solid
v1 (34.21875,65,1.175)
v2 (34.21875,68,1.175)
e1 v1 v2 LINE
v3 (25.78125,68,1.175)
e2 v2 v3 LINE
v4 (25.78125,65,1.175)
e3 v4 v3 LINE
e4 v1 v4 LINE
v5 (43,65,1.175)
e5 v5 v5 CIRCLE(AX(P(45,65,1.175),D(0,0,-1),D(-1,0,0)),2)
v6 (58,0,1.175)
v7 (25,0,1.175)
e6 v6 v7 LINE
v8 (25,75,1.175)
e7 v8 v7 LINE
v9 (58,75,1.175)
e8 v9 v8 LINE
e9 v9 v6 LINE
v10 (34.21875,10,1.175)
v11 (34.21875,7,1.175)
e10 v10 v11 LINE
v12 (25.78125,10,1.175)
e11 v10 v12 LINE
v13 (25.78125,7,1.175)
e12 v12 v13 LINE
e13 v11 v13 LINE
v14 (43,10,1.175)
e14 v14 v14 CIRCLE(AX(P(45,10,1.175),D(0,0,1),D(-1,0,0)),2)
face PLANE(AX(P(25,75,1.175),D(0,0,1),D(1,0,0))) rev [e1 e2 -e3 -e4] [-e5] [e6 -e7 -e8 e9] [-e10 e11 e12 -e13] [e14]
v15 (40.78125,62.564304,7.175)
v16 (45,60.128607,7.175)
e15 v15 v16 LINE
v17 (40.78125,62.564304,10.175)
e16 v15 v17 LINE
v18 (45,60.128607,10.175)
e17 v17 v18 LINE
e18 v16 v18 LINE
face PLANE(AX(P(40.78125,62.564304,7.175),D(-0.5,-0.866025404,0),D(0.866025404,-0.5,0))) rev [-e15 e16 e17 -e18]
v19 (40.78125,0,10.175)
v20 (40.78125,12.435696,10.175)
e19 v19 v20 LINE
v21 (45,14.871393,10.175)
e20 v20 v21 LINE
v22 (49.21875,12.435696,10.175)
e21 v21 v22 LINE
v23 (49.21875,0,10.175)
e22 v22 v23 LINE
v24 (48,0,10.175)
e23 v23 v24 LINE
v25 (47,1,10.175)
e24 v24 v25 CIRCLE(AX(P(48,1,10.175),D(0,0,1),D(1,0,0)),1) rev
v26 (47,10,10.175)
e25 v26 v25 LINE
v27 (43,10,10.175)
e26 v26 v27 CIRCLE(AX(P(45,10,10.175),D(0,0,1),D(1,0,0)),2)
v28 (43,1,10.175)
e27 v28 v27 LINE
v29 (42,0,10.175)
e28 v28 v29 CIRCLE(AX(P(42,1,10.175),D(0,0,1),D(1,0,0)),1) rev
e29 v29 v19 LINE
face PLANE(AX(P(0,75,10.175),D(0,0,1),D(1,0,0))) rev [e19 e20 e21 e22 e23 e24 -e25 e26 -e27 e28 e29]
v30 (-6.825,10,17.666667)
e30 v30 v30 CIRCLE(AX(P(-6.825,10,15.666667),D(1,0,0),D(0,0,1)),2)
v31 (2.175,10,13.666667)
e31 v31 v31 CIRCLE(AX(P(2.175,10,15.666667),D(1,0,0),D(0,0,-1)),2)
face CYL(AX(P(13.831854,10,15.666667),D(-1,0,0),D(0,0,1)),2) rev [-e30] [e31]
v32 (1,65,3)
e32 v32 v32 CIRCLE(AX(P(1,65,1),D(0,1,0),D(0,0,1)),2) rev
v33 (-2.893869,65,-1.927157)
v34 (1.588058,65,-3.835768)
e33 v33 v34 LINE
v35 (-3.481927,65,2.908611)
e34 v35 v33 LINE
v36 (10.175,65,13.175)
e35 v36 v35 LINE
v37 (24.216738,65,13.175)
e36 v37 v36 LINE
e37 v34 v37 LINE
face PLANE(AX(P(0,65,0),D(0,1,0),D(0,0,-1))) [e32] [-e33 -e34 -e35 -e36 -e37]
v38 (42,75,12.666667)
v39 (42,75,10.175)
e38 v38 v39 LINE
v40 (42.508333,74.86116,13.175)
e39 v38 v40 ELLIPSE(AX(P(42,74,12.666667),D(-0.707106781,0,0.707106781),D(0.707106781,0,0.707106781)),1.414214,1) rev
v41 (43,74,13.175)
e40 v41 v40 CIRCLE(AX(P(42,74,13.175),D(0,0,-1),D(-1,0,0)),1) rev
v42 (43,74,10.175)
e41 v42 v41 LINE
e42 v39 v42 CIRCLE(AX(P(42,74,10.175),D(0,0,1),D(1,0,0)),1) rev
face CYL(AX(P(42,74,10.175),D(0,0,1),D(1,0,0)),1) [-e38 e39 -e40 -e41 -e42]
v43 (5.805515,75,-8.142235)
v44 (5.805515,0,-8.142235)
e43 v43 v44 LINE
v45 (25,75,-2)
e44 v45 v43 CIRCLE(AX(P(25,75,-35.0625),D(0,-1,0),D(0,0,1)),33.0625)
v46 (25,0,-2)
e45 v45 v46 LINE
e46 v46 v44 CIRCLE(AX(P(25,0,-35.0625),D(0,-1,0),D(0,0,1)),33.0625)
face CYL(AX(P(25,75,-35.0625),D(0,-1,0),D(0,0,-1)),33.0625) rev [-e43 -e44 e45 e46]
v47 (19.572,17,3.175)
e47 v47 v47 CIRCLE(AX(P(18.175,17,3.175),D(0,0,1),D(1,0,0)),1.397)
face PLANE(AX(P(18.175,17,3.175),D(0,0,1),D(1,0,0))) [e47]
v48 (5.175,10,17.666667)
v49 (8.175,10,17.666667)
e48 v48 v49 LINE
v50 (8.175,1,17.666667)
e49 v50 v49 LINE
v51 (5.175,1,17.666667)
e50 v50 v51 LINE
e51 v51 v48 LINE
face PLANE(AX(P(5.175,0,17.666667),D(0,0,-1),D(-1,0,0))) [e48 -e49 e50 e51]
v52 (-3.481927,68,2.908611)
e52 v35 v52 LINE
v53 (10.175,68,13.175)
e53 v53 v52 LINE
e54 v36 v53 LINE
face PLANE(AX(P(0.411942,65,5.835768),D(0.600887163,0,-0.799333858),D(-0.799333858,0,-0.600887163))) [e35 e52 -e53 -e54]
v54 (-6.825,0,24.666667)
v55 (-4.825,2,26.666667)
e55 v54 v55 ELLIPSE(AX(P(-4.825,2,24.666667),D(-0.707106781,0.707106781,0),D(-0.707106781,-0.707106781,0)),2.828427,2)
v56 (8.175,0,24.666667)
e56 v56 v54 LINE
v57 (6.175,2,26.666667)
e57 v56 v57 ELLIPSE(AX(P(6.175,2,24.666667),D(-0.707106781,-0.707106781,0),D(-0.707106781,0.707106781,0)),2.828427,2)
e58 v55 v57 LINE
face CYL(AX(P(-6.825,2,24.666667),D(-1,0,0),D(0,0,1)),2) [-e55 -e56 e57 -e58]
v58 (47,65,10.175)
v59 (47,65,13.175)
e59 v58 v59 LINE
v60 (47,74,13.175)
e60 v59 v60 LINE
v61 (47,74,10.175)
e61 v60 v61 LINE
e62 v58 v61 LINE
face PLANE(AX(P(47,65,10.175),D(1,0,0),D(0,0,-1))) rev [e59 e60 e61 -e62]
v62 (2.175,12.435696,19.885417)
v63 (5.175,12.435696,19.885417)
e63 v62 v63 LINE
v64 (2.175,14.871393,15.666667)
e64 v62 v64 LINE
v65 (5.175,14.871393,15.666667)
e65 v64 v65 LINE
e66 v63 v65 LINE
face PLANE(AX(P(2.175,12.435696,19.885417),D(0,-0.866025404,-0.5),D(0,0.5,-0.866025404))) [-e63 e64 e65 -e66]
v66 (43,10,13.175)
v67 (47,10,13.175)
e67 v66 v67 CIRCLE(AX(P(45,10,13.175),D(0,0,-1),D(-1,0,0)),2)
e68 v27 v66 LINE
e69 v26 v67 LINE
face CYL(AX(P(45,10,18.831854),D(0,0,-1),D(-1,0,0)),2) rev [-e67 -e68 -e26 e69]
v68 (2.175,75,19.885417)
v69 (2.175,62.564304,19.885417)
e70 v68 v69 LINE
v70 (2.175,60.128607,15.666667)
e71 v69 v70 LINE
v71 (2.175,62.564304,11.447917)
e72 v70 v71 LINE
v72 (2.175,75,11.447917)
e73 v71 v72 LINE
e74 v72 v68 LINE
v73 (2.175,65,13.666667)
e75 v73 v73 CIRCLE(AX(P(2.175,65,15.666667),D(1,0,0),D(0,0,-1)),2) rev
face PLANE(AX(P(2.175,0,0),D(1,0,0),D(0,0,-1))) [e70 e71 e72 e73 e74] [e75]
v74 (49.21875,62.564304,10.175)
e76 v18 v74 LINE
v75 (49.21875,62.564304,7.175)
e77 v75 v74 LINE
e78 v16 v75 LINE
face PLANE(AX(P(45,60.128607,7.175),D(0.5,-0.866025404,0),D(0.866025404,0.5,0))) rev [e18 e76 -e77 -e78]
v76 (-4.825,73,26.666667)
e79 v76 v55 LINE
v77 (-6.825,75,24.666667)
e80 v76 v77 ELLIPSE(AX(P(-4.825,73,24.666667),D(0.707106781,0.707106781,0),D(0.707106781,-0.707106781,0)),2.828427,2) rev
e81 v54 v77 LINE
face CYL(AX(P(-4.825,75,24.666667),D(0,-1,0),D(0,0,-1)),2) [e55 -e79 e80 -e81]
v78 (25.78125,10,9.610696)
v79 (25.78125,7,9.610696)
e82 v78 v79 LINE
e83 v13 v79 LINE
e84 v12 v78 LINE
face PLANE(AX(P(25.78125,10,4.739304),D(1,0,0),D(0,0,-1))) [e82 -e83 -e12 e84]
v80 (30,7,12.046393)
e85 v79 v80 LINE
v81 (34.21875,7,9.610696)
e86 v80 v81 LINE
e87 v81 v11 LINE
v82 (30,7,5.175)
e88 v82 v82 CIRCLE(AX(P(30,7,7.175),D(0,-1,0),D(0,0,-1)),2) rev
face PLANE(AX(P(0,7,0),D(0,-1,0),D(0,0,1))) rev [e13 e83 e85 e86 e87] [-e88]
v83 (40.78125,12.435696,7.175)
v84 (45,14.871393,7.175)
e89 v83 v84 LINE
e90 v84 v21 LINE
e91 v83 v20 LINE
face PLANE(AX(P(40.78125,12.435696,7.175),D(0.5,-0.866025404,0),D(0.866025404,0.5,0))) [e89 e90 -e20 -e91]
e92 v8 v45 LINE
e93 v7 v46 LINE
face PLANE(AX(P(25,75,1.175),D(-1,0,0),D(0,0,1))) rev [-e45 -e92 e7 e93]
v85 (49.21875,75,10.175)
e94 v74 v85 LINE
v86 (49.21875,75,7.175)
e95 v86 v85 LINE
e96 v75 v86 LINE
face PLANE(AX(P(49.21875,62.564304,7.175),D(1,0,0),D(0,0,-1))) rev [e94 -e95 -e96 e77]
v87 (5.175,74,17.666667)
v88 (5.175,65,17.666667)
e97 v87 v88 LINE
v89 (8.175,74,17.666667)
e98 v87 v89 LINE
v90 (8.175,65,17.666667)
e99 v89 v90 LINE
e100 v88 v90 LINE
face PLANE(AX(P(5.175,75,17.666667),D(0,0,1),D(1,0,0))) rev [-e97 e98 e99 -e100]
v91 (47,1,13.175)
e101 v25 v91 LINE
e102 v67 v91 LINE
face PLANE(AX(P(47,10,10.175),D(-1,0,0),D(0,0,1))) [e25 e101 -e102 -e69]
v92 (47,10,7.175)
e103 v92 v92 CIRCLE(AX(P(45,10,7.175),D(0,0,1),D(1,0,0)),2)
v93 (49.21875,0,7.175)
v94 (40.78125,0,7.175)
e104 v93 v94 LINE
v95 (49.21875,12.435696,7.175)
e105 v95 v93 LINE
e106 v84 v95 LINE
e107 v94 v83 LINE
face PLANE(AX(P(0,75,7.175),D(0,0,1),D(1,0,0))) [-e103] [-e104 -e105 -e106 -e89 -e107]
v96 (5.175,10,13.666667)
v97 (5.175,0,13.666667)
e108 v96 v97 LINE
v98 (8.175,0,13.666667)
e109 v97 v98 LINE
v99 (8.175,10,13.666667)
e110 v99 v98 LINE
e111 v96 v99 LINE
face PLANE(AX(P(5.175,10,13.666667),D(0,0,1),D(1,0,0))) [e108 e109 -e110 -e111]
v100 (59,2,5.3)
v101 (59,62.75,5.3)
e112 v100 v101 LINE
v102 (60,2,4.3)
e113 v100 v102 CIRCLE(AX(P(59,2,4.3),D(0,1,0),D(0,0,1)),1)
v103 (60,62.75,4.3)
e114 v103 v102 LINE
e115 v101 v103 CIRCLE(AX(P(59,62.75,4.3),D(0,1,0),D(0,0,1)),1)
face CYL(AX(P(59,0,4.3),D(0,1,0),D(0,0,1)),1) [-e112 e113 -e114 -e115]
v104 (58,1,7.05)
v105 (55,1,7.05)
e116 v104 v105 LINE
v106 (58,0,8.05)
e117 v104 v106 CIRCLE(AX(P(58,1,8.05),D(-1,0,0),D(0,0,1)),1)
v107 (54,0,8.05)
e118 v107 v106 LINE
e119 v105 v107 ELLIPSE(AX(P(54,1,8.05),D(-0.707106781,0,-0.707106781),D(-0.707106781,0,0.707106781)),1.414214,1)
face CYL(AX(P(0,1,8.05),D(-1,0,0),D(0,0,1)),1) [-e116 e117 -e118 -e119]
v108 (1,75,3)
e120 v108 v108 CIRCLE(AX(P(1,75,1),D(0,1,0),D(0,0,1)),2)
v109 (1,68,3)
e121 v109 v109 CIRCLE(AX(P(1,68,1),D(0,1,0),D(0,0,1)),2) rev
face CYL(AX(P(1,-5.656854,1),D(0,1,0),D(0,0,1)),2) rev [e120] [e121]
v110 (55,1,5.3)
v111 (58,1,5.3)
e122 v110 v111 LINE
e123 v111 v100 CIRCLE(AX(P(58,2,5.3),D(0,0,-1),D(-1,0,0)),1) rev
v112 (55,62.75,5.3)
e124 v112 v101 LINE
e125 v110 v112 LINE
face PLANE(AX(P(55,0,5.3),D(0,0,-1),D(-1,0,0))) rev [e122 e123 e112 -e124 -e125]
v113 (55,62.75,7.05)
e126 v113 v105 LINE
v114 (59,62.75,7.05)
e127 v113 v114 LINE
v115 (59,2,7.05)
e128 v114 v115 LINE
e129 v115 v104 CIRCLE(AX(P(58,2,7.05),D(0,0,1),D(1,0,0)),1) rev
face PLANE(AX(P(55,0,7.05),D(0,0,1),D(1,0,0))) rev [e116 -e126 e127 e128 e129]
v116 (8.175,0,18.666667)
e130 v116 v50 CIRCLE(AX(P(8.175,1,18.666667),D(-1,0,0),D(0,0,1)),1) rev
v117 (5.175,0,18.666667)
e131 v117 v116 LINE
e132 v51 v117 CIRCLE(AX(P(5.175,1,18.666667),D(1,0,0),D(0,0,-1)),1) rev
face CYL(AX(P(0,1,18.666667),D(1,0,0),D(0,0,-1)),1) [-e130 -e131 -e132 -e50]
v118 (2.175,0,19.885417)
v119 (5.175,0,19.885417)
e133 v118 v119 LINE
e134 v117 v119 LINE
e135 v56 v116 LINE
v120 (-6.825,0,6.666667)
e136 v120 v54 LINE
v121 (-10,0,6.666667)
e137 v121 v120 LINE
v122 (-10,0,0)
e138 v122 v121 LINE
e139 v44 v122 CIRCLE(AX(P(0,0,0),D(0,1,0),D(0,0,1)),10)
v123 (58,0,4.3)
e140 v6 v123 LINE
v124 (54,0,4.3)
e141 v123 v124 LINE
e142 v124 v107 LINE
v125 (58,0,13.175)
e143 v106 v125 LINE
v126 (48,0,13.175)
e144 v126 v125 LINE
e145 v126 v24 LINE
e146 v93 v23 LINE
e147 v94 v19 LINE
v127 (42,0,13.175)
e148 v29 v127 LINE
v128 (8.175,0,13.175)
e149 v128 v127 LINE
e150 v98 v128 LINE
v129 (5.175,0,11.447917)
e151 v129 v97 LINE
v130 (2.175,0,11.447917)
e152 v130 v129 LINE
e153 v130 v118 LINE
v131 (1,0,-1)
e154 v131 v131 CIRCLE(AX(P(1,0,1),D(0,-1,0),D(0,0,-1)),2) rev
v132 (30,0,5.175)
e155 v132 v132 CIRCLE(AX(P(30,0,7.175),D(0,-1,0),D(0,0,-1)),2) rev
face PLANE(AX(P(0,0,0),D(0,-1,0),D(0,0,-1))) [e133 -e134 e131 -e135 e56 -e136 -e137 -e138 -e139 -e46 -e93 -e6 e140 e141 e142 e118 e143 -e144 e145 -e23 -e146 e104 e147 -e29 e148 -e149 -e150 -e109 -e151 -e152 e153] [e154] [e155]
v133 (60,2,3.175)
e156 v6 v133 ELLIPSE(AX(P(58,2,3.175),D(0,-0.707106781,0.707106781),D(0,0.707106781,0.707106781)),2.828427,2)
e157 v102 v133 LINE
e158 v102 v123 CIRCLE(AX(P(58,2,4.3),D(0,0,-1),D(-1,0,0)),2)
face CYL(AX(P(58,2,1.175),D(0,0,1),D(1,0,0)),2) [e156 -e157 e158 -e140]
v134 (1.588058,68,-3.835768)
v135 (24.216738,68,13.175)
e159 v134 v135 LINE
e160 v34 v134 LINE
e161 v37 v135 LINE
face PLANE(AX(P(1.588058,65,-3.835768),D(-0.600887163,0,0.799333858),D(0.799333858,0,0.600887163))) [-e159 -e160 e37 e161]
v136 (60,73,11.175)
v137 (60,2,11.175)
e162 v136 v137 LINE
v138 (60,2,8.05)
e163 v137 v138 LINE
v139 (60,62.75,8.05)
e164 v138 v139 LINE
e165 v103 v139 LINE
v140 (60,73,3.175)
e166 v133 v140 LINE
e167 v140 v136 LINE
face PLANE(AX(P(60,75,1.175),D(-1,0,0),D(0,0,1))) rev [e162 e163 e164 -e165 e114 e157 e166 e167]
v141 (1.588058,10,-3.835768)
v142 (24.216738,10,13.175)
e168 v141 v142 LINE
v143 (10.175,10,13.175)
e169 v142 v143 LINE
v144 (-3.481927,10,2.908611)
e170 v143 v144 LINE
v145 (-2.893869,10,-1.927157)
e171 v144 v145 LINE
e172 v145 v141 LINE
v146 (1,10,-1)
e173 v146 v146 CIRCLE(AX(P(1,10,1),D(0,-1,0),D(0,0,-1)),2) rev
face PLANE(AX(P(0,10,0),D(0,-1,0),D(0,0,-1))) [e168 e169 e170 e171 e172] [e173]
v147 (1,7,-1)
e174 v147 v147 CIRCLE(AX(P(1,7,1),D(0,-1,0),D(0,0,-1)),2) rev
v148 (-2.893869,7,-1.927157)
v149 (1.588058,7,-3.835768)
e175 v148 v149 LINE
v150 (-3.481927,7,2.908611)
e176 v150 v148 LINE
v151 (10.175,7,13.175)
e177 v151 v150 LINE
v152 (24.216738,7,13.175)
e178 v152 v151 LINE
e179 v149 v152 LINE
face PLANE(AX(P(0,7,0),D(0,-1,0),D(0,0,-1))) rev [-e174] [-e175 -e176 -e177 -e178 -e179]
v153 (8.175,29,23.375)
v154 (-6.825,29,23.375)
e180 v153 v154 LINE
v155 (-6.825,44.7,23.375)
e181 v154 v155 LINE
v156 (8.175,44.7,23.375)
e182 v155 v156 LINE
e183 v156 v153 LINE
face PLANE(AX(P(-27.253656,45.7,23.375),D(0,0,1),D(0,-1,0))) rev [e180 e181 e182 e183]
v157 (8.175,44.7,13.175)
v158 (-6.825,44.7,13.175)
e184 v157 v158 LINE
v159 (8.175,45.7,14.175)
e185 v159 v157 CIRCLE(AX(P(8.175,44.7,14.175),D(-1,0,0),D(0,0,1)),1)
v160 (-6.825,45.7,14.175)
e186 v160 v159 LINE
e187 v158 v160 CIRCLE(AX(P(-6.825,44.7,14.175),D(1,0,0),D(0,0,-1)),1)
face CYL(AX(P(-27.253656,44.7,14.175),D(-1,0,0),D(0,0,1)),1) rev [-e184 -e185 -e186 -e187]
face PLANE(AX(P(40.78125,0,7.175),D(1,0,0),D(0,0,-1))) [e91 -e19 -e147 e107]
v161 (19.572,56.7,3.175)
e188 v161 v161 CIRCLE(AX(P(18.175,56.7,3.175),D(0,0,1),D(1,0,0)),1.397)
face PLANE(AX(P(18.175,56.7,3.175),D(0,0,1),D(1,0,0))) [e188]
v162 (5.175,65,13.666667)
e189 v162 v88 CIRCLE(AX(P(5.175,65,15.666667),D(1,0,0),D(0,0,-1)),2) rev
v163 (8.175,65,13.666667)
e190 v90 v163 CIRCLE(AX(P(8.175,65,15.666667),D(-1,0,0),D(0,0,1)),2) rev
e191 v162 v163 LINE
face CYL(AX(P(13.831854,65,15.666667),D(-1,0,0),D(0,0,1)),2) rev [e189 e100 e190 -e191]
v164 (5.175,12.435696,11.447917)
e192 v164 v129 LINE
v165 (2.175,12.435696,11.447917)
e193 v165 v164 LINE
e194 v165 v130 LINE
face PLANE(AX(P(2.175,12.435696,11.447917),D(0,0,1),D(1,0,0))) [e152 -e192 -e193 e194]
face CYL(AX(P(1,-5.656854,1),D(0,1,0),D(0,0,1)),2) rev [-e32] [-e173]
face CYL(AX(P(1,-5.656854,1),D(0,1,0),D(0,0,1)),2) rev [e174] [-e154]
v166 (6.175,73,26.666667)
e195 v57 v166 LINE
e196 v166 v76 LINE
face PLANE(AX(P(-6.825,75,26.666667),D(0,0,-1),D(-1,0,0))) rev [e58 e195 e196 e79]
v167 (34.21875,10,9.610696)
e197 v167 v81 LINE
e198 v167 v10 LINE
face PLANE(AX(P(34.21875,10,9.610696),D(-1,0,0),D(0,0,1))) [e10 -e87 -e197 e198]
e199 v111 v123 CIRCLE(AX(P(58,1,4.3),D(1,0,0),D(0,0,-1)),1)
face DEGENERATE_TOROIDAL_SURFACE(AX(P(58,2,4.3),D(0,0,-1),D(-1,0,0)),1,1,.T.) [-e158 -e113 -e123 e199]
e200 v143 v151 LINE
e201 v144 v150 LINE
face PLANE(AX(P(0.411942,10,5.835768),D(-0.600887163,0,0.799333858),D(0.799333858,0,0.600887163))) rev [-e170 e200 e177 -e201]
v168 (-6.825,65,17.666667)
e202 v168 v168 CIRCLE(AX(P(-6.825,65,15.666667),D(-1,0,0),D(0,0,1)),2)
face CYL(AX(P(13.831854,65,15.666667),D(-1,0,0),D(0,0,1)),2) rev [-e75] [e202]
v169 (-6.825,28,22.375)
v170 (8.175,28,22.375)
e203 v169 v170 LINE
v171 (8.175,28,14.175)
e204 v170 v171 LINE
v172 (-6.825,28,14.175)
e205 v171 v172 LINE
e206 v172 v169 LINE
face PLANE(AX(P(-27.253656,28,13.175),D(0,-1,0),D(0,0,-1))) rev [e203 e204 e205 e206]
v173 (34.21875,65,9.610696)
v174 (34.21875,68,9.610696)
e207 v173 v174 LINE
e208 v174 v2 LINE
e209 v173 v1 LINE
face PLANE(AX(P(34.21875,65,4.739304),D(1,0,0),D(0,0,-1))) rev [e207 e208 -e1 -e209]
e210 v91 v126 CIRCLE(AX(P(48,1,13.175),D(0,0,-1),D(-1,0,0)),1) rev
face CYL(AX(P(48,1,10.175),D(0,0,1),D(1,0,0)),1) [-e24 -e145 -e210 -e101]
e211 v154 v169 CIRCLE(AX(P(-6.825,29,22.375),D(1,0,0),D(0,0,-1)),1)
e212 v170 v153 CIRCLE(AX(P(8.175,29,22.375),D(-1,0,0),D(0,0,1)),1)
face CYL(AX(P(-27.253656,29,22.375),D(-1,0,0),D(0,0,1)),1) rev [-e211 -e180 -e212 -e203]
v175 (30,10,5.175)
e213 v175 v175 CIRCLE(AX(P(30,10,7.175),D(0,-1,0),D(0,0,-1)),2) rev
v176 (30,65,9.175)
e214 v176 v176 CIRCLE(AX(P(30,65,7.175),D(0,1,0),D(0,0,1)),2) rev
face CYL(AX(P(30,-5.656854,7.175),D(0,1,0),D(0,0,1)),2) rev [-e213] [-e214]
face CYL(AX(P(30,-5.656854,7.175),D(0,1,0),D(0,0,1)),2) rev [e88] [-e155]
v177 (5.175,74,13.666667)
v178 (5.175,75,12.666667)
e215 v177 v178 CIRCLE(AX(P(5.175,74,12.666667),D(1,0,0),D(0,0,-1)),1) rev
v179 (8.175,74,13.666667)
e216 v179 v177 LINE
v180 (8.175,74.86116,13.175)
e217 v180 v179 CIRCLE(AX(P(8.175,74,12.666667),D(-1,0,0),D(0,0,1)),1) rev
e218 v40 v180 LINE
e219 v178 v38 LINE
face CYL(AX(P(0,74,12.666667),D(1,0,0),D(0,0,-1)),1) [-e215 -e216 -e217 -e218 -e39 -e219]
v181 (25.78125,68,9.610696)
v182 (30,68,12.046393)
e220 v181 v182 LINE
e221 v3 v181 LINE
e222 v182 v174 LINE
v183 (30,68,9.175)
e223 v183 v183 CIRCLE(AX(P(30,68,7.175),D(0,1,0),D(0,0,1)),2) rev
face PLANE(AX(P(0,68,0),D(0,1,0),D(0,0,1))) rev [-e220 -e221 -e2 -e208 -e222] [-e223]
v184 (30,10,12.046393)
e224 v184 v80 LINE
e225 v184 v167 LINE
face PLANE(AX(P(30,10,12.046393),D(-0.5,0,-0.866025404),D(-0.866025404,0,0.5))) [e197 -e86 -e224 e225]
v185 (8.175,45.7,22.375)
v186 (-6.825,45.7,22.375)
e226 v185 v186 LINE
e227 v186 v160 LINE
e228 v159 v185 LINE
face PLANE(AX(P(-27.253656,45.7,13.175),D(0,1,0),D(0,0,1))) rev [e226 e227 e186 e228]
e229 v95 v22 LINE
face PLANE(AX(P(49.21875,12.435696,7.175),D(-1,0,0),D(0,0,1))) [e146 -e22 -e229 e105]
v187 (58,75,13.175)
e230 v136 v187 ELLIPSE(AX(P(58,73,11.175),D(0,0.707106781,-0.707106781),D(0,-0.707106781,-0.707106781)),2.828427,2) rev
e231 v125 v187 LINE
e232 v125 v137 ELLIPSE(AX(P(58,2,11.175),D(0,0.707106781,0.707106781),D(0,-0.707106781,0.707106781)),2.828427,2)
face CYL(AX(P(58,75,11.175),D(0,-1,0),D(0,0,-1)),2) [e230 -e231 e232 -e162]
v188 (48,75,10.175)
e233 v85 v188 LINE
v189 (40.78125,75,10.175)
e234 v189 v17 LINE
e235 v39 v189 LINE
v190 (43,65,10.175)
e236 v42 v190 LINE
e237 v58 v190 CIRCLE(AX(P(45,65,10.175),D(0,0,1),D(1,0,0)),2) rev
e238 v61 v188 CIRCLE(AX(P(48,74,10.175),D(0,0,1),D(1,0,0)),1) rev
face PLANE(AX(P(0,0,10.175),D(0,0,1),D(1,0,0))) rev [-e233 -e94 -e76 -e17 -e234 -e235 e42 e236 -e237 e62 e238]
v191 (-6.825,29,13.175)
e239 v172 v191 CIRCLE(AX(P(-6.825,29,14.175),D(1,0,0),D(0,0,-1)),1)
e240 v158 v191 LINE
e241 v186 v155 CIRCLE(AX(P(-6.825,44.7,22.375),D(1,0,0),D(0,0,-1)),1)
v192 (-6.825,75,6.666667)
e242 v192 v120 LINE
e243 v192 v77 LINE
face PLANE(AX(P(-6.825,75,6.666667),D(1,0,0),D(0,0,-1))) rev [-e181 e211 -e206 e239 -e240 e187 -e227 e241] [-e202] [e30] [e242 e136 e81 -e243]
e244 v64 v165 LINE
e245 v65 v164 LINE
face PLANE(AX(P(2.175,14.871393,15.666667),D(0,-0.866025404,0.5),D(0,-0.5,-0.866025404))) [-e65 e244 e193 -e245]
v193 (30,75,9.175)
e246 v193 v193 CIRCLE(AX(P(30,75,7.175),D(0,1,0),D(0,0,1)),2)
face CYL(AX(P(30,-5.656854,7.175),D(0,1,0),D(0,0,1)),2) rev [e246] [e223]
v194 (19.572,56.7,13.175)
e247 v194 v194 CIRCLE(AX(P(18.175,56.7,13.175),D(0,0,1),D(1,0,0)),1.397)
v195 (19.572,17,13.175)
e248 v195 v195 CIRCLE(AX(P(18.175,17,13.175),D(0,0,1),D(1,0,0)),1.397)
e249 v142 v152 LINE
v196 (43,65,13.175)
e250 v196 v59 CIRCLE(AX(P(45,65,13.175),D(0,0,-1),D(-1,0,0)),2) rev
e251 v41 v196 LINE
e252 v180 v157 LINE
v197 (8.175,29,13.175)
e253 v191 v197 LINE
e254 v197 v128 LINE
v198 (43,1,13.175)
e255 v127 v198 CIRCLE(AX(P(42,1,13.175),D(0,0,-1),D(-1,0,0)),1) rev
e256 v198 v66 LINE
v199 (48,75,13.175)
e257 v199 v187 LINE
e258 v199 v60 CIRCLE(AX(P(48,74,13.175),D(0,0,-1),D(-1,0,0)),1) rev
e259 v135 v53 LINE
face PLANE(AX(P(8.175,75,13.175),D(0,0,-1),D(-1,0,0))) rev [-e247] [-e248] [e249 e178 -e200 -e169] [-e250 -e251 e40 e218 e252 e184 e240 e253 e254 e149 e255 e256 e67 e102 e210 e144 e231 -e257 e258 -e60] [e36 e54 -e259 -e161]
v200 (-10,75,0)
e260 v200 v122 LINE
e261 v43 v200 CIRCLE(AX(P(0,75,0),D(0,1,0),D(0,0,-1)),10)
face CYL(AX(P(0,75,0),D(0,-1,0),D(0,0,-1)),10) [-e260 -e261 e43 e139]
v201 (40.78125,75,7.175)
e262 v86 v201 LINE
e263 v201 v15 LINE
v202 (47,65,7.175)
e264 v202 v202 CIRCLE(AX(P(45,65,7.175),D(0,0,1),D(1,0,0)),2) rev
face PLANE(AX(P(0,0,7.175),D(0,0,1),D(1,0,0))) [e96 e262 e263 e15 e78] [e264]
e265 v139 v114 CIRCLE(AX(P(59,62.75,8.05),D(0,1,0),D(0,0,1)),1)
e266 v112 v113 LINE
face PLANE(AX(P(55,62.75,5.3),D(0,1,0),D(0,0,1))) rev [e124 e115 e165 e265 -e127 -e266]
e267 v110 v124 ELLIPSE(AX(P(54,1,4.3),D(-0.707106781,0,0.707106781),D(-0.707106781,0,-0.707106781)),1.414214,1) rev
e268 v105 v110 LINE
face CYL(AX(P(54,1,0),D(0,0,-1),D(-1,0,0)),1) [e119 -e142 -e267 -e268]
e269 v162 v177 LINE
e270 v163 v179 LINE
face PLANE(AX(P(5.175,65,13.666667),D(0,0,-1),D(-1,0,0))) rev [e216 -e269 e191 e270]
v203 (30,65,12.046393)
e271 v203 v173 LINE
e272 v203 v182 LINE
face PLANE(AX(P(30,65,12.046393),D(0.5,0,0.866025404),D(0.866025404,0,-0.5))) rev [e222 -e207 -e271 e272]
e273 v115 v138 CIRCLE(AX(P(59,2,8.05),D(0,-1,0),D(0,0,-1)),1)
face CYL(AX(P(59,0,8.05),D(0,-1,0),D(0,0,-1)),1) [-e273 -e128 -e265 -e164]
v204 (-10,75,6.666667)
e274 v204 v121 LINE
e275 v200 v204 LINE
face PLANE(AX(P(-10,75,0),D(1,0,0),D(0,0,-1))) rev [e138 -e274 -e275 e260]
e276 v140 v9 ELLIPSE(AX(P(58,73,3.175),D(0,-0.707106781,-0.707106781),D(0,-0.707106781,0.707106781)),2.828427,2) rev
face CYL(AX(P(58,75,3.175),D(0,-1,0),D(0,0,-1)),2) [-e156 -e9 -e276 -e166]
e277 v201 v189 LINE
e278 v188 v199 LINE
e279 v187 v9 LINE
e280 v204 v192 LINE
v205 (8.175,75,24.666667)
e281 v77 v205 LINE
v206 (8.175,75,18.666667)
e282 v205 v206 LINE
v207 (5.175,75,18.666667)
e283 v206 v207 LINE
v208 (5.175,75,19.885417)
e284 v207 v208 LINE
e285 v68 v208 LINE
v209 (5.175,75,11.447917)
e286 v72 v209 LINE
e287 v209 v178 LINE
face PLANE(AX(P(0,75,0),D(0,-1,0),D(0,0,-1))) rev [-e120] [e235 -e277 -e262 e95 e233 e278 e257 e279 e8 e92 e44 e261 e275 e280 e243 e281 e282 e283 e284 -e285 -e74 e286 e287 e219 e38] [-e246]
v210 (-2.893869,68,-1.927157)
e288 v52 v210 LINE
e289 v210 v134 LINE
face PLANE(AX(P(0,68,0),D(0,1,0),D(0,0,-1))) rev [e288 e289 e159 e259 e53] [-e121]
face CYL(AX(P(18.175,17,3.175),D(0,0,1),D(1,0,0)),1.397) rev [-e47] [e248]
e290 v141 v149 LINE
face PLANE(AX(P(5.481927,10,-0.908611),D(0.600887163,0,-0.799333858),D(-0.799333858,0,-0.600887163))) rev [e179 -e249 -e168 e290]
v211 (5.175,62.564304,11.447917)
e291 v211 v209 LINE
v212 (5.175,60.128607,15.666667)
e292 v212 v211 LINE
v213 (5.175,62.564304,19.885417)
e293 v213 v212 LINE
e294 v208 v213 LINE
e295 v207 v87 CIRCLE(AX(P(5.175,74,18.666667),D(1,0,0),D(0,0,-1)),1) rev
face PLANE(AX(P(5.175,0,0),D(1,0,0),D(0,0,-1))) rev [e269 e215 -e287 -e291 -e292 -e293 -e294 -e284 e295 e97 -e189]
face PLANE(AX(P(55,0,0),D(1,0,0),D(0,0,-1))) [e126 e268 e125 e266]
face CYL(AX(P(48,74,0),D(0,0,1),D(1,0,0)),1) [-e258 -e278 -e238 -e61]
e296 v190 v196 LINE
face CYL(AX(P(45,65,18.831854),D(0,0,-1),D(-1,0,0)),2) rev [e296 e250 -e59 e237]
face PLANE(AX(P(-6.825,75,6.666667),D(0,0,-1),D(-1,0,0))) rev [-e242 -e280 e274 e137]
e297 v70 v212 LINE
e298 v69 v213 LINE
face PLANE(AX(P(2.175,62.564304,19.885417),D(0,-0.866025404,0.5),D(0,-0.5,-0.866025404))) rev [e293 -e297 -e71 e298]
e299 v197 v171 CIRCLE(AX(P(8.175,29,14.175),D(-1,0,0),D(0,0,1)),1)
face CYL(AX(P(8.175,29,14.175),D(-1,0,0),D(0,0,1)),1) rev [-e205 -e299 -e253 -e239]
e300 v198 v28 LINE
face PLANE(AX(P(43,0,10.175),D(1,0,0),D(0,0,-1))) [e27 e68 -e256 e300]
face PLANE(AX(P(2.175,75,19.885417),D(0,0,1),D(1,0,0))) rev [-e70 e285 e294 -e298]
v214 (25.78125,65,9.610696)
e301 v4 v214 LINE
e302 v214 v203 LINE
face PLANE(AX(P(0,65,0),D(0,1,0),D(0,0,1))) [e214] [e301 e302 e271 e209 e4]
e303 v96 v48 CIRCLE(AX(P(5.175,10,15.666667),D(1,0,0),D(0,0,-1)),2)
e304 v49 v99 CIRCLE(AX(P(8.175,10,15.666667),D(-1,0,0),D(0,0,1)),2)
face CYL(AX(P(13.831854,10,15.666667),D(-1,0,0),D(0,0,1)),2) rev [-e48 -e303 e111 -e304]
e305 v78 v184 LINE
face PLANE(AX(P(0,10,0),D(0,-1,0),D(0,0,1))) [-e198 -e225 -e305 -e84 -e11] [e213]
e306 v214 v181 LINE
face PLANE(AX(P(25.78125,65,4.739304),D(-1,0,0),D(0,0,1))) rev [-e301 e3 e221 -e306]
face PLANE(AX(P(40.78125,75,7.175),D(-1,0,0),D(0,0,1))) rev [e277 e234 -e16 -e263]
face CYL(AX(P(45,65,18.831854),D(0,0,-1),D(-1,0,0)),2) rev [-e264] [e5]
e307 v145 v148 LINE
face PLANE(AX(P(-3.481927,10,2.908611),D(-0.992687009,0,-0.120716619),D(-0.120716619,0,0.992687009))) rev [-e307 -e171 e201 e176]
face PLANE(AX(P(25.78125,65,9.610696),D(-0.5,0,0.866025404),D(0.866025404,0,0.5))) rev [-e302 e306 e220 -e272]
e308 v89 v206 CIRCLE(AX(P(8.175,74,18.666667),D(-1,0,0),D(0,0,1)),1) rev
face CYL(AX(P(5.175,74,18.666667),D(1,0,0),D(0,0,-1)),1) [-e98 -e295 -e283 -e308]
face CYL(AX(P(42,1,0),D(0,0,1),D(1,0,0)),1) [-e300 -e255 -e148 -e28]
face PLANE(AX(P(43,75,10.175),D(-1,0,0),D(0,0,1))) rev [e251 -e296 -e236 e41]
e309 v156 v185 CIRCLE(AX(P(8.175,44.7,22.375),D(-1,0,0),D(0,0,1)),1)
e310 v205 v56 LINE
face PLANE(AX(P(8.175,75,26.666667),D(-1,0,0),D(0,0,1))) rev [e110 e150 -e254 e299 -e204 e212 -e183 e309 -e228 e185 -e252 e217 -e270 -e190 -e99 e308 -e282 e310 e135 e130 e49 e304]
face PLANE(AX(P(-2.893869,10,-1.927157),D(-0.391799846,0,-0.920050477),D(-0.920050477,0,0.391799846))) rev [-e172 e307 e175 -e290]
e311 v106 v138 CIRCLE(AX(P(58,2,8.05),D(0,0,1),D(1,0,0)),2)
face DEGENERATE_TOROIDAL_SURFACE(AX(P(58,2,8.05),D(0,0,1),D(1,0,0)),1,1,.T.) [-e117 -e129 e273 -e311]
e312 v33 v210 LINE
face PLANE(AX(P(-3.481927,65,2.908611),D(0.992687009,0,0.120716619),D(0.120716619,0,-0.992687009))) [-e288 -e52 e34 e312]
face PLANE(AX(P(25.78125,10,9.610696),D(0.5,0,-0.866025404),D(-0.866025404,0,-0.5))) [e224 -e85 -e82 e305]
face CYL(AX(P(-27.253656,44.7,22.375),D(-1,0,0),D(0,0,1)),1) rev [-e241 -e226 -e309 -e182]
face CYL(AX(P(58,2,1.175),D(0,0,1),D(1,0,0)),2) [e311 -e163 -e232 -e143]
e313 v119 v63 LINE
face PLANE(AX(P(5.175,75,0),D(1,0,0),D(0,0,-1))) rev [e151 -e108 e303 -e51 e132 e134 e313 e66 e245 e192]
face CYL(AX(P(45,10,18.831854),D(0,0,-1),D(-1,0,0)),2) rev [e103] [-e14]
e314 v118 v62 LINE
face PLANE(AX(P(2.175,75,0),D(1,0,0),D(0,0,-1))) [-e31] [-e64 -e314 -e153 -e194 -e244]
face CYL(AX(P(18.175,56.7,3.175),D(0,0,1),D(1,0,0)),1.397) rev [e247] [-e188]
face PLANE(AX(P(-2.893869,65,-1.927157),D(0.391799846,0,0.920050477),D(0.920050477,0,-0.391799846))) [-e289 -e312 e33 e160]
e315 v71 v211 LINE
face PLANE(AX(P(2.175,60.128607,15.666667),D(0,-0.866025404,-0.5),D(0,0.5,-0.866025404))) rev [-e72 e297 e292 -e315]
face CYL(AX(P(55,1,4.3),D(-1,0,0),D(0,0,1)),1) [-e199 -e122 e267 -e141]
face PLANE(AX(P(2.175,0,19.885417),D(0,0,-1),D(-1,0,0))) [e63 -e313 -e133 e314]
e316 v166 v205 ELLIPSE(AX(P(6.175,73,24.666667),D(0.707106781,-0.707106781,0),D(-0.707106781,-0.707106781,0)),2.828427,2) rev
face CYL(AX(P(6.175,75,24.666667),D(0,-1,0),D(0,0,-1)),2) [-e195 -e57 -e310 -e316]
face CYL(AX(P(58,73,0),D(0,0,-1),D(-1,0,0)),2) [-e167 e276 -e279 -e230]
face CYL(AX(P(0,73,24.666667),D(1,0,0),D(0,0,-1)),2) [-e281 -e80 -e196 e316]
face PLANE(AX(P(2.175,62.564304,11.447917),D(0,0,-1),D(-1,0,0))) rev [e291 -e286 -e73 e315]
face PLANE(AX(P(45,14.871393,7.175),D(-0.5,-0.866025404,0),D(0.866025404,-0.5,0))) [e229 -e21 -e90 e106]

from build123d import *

# Parameters (mm, degrees)
BOSS_EXTRUDE1_DEPTH = 75
SKETCH2_R           = 2
CUT_EXTRUDE1_DEPTH  = 15
SKETCH4_R           = 2
CUT_EXTRUDE2_DEPTH  = 12
SKETCH3_R           = 2
CUT_EXTRUDE3_DEPTH  = 75
CUT_EXTRUDE4_START  = -3
CUT_EXTRUDE4_DEPTH  = 3
CUT_EXTRUDE5_START  = -3
CUT_EXTRUDE5_DEPTH  = 3
CUT_EXTRUDE6_START  = -3
CUT_EXTRUDE6_DEPTH  = 3
CUT_EXTRUDE7_START  = -3
CUT_EXTRUDE7_DEPTH  = 3
CUT_EXTRUDE12_START = -7
CUT_EXTRUDE12_DEPTH = 3
CUT_EXTRUDE14_START = -7
CUT_EXTRUDE14_DEPTH = 3
FILLET2_START       = 9
FILLET2_DEPTH       = 4.666666667
FILLET2_START_2     = 4
FILLET2_2_DEPTH     = 39
FILLET3_R           = 2
SKETCH10_W          = 1.75
SKETCH10_H          = 62.75
CUT_EXTRUDE9_DEPTH  = 5
FILLET4_R           = 1
SKETCH11_W          = 10.2
SKETCH11_H          = 17.7
CUT_EXTRUDE10_DEPTH = 15
SKETCH12_R          = 1.397
CUT_EXTRUDE11_DEPTH = 10
FILLET5_R           = 1


with BuildPart() as part:
    # Sketch1 → Boss-Extrude1 (new body)
    with BuildSketch(Plane(origin=(0, 0, 0), x_dir=(1, 0, 0), z_dir=(0, 1, 0))):
        with BuildLine():
            Line((-6.825, -6.666666667), (-6.825, -26.666666667))
            Line((-6.825, -26.666666667), (8.175, -26.666666667))
            Line((8.175, -26.666666667), (8.175, -13.175))
            Line((8.175, -13.175), (60, -13.175))
            Line((60, -13.175), (60, -1.175))
            Line((60, -1.175), (25, -1.175))
            Line((25, -1.175), (25, 2))
            ThreePointArc((25, 2), (14.923352523, 3.572976633), (5.805515239, 8.142235123))
            ThreePointArc((5.805515239, 8.142235123), (3.047757271, 9.524241472), (0, 10))
            ThreePointArc((0, 10), (-7.071067812, 7.071067812), (-10, 0))
            Line((-10, 0), (-10, -6.666666667))
            Line((-10, -6.666666667), (-6.825, -6.666666667))
        make_face()
    extrude(amount=BOSS_EXTRUDE1_DEPTH)

    # Sketch2 → Cut-Extrude1 (cut)
    with BuildSketch(Plane.ZY.offset(6.825)):
        with Locations((15.666666667, 65)):
            Circle(SKETCH2_R)
    cut_extrude1 = extrude(amount=-CUT_EXTRUDE1_DEPTH, mode=Mode.SUBTRACT)

    # Sketch4 → Cut-Extrude2 (cut)
    with BuildSketch(Plane(origin=(0, 0, 1.175), x_dir=(-1, 0, 0), z_dir=(0, 0, -1))):
        with Locations((-45, 65)):
            Circle(SKETCH4_R)
    cut_extrude2 = extrude(amount=-CUT_EXTRUDE2_DEPTH, mode=Mode.SUBTRACT)

    # Sketch3 → Cut-Extrude3 (cut)
    with BuildSketch(Plane(origin=(0, 75, 0), x_dir=(1, 0, 0), z_dir=(0, 1, 0))):
        with Locations(Location((1, -1, 0), (0, 0, 270))):
            Circle(SKETCH3_R)
        with Locations(Location((30, -7.175, 0), (0, 0, 270))):
            Circle(SKETCH3_R)
    extrude(amount=-CUT_EXTRUDE3_DEPTH, mode=Mode.SUBTRACT)

    # Sketch5 → Cut-Extrude4 (cut)
    with BuildSketch(Plane(origin=(8.175, 0, 0), x_dir=(0, 0, -1), z_dir=(1, 0, 0)).offset(CUT_EXTRUDE4_START)):
        Polygon((-19.885416667, 62.564303552), (-15.666666667, 60.128607104), (-11.447916667, 62.564303552), (-11.447916667, 75), (-19.885416667, 75), align=None)
    cut_extrude4 = extrude(amount=-CUT_EXTRUDE4_DEPTH, mode=Mode.SUBTRACT)

    # Sketch6 → Cut-Extrude5 (cut)
    with BuildSketch(Plane(origin=(8.175, 0, 0), x_dir=(0, 0, -1), z_dir=(1, 0, 0)).offset(CUT_EXTRUDE5_START)):
        with BuildLine():
            Line((-13.666666667, 65), (-13.666666667, 75))
            Line((-13.666666667, 75), (-17.666666667, 75))
            Line((-17.666666667, 75), (-17.666666667, 65))
            ThreePointArc((-17.666666667, 65), (-15.666666667, 67), (-13.666666667, 65))
        make_face()
    cut_extrude5 = extrude(amount=CUT_EXTRUDE5_DEPTH, mode=Mode.SUBTRACT)

    # Sketch7 → Cut-Extrude6 (cut)
    with BuildSketch(Plane.XY.offset(13.175).offset(CUT_EXTRUDE6_START)):
        Polygon((40.78125, 62.564303552), (45, 60.128607104), (49.21875, 62.564303552), (49.21875, 75), (40.78125, 75), align=None)
    cut_extrude6 = extrude(amount=-CUT_EXTRUDE6_DEPTH, mode=Mode.SUBTRACT)

    # Sketch8 → Cut-Extrude7 (cut)
    with BuildSketch(Plane.XY.offset(13.175).offset(CUT_EXTRUDE7_START)):
        with BuildLine():
            Line((47, 65), (47, 75))
            Line((47, 75), (43, 75))
            Line((43, 75), (43, 65))
            ThreePointArc((43, 65), (45, 67), (47, 65))
        make_face()
    cut_extrude7 = extrude(amount=CUT_EXTRUDE7_DEPTH, mode=Mode.SUBTRACT)

    # Sketch13 → Cut-Extrude12 (cut)
    with BuildSketch(Plane.XZ.offset(CUT_EXTRUDE12_START)):
        Polygon((-2.893869279, -1.927157459), (1.588058081, -3.835768444), (5.48192736, -0.908610985), (24.216737808, 13.175), (10.175, 13.175), (0.411941919, 5.835768444), (-3.48192736, 2.908610985), align=None)
    cut_extrude12 = extrude(amount=-CUT_EXTRUDE12_DEPTH, mode=Mode.SUBTRACT)

    # Sketch16 → Cut-Extrude14 (cut)
    with BuildSketch(Plane(origin=(0, 75, 0), x_dir=(1, 0, 0), z_dir=(0, 1, 0)).offset(CUT_EXTRUDE14_START)):
        Polygon((25.78125, -4.739303552), (25.78125, -1.175), (34.21875, -1.175), (34.21875, -4.739303552), (34.21875, -9.610696448), (30, -12.046392896), (25.78125, -9.610696448), align=None)
    cut_extrude14 = extrude(amount=-CUT_EXTRUDE14_DEPTH, mode=Mode.SUBTRACT)

    # Mirror2: Cut-Extrude1, Cut-Extrude2, Cut-Extrude4, Cut-Extrude5, Cut-Extrude6, Cut-Extrude7, Cut-Extrude12, Cut-Extrude14 across plane
    add(cut_extrude1.mirror(Plane.ZX.offset(37.5)), mode=Mode.SUBTRACT)
    add(cut_extrude2.mirror(Plane.ZX.offset(37.5)), mode=Mode.SUBTRACT)
    add(cut_extrude4.mirror(Plane.ZX.offset(37.5)), mode=Mode.SUBTRACT)
    add(cut_extrude5.mirror(Plane.ZX.offset(37.5)), mode=Mode.SUBTRACT)
    add(cut_extrude6.mirror(Plane.ZX.offset(37.5)), mode=Mode.SUBTRACT)
    add(cut_extrude7.mirror(Plane.ZX.offset(37.5)), mode=Mode.SUBTRACT)
    add(cut_extrude12.mirror(Plane.ZX.offset(37.5)), mode=Mode.SUBTRACT)
    add(cut_extrude14.mirror(Plane.ZX.offset(37.5)), mode=Mode.SUBTRACT)

    # Fillet2: read off the stored shape, not the designer's step
    # Fillet2 outline → Fillet2 (cut)
    with BuildSketch(Plane.XY.offset(FILLET2_START)):
        with BuildLine():
            Line((47, 1), (47, 0))
            Line((47, 0), (48, 0))
            ThreePointArc((48, 0), (47.292893219, 0.292893219), (47, 1))
        make_face()
        with BuildLine():
            Line((48, 75), (47, 75))
            Line((47, 75), (47, 74))
            ThreePointArc((47, 74), (47.292893219, 74.707106781), (48, 75))
        make_face()
        with BuildLine():
            Line((43, 75), (42, 75))
            ThreePointArc((42, 75), (42.707106781, 74.707106781), (43, 74))
            Line((43, 74), (43, 75))
        make_face()
        with BuildLine():
            ThreePointArc((43, 1), (42.707106781, 0.292893219), (42, 0))
            Line((42, 0), (43, 0))
            Line((43, 0), (43, 1))
        make_face()
    extrude(amount=FILLET2_DEPTH, mode=Mode.SUBTRACT)

    # Fillet2 2 outline → Fillet2 2 (cut)
    with BuildSketch(Plane.YZ.offset(FILLET2_START_2)):
        with BuildLine():
            Line((74, 17.666666667), (75, 17.666666667))
            Line((75, 17.666666667), (75, 18.666666667))
            ThreePointArc((75, 18.666666667), (74.707106782, 17.959559886), (74, 17.666666667))
        make_face()
        with BuildLine():
            ThreePointArc((74, 13.666666667), (74.707106781, 13.373773448), (75, 12.666666667))
            Line((75, 12.666666667), (75, 13.666666667))
            Line((75, 13.666666667), (74, 13.666666667))
        make_face()
        with BuildLine():
            ThreePointArc((1, 17.666666667), (0.292893218, 17.959559886), (0, 18.666666667))
            Line((0, 18.666666667), (0, 17.666666667))
            Line((0, 17.666666667), (1, 17.666666667))
        make_face()
    extrude(amount=FILLET2_2_DEPTH, mode=Mode.SUBTRACT)

    # Fillet3
    fillet3_edges = [part.edges().sort_by_distance(p)[0] for p in [
        (60, 0, 7.175),
        (0.675, 0, 26.666666667),
        (60, 37.5, 1.175),
        (60, 37.5, 13.175),
        (8.175, 37.5, 26.666666667),
        (-6.825, 37.5, 26.666666667),
        (0.675, 75, 26.666666667),
        (60, 75, 7.175),
    ]]
    fillet(fillet3_edges, radius=FILLET3_R)

    # Sketch10 → Cut-Extrude9 (cut)
    with BuildSketch(Plane(origin=(60, 0, 0), x_dir=(0, 0, -1), z_dir=(1, 0, 0))):
        with Locations((-6.175, 31.375)):
            Rectangle(SKETCH10_W, SKETCH10_H)
    extrude(amount=-CUT_EXTRUDE9_DEPTH, mode=Mode.SUBTRACT)

    # Fillet4
    fillet4_edges = [part.edges().sort_by_distance(p)[0] for p in [
        (59.414213562, 0.585786438, 7.05),
        (59.414213562, 0.585786438, 5.3),
        (60, 32.375, 7.05),
        (60, 32.375, 5.3),
        (55, 0, 6.175),
        (56.5, 0, 5.3),
        (56.5, 0, 7.05),
    ]]
    fillet(fillet4_edges, radius=FILLET4_R)

    # Sketch11 → Cut-Extrude10 (cut)
    with BuildSketch(Plane(origin=(8.175, 0, 0), x_dir=(0, 0, -1), z_dir=(1, 0, 0))):
        with Locations((-18.275, 36.85)):
            Rectangle(SKETCH11_W, SKETCH11_H)
    extrude(amount=-CUT_EXTRUDE10_DEPTH, mode=Mode.SUBTRACT)

    # Sketch12 → Cut-Extrude11 (cut)
    with BuildSketch(Plane.XY.offset(13.175)):
        with Locations((18.175, 17)):
            Circle(SKETCH12_R)
        with Locations((18.175, 56.7)):
            Circle(SKETCH12_R)
    extrude(amount=-CUT_EXTRUDE11_DEPTH, mode=Mode.SUBTRACT)

    # Fillet5
    fillet5_edges = [part.edges().sort_by_distance(p)[0] for p in [
        (0.675, 45.7, 13.175),
        (0.675, 28, 13.175),
        (0.675, 28, 23.375),
        (0.675, 45.7, 23.375),
    ]]
    fillet(fillet5_edges, radius=FILLET5_R)


solid = part.part
